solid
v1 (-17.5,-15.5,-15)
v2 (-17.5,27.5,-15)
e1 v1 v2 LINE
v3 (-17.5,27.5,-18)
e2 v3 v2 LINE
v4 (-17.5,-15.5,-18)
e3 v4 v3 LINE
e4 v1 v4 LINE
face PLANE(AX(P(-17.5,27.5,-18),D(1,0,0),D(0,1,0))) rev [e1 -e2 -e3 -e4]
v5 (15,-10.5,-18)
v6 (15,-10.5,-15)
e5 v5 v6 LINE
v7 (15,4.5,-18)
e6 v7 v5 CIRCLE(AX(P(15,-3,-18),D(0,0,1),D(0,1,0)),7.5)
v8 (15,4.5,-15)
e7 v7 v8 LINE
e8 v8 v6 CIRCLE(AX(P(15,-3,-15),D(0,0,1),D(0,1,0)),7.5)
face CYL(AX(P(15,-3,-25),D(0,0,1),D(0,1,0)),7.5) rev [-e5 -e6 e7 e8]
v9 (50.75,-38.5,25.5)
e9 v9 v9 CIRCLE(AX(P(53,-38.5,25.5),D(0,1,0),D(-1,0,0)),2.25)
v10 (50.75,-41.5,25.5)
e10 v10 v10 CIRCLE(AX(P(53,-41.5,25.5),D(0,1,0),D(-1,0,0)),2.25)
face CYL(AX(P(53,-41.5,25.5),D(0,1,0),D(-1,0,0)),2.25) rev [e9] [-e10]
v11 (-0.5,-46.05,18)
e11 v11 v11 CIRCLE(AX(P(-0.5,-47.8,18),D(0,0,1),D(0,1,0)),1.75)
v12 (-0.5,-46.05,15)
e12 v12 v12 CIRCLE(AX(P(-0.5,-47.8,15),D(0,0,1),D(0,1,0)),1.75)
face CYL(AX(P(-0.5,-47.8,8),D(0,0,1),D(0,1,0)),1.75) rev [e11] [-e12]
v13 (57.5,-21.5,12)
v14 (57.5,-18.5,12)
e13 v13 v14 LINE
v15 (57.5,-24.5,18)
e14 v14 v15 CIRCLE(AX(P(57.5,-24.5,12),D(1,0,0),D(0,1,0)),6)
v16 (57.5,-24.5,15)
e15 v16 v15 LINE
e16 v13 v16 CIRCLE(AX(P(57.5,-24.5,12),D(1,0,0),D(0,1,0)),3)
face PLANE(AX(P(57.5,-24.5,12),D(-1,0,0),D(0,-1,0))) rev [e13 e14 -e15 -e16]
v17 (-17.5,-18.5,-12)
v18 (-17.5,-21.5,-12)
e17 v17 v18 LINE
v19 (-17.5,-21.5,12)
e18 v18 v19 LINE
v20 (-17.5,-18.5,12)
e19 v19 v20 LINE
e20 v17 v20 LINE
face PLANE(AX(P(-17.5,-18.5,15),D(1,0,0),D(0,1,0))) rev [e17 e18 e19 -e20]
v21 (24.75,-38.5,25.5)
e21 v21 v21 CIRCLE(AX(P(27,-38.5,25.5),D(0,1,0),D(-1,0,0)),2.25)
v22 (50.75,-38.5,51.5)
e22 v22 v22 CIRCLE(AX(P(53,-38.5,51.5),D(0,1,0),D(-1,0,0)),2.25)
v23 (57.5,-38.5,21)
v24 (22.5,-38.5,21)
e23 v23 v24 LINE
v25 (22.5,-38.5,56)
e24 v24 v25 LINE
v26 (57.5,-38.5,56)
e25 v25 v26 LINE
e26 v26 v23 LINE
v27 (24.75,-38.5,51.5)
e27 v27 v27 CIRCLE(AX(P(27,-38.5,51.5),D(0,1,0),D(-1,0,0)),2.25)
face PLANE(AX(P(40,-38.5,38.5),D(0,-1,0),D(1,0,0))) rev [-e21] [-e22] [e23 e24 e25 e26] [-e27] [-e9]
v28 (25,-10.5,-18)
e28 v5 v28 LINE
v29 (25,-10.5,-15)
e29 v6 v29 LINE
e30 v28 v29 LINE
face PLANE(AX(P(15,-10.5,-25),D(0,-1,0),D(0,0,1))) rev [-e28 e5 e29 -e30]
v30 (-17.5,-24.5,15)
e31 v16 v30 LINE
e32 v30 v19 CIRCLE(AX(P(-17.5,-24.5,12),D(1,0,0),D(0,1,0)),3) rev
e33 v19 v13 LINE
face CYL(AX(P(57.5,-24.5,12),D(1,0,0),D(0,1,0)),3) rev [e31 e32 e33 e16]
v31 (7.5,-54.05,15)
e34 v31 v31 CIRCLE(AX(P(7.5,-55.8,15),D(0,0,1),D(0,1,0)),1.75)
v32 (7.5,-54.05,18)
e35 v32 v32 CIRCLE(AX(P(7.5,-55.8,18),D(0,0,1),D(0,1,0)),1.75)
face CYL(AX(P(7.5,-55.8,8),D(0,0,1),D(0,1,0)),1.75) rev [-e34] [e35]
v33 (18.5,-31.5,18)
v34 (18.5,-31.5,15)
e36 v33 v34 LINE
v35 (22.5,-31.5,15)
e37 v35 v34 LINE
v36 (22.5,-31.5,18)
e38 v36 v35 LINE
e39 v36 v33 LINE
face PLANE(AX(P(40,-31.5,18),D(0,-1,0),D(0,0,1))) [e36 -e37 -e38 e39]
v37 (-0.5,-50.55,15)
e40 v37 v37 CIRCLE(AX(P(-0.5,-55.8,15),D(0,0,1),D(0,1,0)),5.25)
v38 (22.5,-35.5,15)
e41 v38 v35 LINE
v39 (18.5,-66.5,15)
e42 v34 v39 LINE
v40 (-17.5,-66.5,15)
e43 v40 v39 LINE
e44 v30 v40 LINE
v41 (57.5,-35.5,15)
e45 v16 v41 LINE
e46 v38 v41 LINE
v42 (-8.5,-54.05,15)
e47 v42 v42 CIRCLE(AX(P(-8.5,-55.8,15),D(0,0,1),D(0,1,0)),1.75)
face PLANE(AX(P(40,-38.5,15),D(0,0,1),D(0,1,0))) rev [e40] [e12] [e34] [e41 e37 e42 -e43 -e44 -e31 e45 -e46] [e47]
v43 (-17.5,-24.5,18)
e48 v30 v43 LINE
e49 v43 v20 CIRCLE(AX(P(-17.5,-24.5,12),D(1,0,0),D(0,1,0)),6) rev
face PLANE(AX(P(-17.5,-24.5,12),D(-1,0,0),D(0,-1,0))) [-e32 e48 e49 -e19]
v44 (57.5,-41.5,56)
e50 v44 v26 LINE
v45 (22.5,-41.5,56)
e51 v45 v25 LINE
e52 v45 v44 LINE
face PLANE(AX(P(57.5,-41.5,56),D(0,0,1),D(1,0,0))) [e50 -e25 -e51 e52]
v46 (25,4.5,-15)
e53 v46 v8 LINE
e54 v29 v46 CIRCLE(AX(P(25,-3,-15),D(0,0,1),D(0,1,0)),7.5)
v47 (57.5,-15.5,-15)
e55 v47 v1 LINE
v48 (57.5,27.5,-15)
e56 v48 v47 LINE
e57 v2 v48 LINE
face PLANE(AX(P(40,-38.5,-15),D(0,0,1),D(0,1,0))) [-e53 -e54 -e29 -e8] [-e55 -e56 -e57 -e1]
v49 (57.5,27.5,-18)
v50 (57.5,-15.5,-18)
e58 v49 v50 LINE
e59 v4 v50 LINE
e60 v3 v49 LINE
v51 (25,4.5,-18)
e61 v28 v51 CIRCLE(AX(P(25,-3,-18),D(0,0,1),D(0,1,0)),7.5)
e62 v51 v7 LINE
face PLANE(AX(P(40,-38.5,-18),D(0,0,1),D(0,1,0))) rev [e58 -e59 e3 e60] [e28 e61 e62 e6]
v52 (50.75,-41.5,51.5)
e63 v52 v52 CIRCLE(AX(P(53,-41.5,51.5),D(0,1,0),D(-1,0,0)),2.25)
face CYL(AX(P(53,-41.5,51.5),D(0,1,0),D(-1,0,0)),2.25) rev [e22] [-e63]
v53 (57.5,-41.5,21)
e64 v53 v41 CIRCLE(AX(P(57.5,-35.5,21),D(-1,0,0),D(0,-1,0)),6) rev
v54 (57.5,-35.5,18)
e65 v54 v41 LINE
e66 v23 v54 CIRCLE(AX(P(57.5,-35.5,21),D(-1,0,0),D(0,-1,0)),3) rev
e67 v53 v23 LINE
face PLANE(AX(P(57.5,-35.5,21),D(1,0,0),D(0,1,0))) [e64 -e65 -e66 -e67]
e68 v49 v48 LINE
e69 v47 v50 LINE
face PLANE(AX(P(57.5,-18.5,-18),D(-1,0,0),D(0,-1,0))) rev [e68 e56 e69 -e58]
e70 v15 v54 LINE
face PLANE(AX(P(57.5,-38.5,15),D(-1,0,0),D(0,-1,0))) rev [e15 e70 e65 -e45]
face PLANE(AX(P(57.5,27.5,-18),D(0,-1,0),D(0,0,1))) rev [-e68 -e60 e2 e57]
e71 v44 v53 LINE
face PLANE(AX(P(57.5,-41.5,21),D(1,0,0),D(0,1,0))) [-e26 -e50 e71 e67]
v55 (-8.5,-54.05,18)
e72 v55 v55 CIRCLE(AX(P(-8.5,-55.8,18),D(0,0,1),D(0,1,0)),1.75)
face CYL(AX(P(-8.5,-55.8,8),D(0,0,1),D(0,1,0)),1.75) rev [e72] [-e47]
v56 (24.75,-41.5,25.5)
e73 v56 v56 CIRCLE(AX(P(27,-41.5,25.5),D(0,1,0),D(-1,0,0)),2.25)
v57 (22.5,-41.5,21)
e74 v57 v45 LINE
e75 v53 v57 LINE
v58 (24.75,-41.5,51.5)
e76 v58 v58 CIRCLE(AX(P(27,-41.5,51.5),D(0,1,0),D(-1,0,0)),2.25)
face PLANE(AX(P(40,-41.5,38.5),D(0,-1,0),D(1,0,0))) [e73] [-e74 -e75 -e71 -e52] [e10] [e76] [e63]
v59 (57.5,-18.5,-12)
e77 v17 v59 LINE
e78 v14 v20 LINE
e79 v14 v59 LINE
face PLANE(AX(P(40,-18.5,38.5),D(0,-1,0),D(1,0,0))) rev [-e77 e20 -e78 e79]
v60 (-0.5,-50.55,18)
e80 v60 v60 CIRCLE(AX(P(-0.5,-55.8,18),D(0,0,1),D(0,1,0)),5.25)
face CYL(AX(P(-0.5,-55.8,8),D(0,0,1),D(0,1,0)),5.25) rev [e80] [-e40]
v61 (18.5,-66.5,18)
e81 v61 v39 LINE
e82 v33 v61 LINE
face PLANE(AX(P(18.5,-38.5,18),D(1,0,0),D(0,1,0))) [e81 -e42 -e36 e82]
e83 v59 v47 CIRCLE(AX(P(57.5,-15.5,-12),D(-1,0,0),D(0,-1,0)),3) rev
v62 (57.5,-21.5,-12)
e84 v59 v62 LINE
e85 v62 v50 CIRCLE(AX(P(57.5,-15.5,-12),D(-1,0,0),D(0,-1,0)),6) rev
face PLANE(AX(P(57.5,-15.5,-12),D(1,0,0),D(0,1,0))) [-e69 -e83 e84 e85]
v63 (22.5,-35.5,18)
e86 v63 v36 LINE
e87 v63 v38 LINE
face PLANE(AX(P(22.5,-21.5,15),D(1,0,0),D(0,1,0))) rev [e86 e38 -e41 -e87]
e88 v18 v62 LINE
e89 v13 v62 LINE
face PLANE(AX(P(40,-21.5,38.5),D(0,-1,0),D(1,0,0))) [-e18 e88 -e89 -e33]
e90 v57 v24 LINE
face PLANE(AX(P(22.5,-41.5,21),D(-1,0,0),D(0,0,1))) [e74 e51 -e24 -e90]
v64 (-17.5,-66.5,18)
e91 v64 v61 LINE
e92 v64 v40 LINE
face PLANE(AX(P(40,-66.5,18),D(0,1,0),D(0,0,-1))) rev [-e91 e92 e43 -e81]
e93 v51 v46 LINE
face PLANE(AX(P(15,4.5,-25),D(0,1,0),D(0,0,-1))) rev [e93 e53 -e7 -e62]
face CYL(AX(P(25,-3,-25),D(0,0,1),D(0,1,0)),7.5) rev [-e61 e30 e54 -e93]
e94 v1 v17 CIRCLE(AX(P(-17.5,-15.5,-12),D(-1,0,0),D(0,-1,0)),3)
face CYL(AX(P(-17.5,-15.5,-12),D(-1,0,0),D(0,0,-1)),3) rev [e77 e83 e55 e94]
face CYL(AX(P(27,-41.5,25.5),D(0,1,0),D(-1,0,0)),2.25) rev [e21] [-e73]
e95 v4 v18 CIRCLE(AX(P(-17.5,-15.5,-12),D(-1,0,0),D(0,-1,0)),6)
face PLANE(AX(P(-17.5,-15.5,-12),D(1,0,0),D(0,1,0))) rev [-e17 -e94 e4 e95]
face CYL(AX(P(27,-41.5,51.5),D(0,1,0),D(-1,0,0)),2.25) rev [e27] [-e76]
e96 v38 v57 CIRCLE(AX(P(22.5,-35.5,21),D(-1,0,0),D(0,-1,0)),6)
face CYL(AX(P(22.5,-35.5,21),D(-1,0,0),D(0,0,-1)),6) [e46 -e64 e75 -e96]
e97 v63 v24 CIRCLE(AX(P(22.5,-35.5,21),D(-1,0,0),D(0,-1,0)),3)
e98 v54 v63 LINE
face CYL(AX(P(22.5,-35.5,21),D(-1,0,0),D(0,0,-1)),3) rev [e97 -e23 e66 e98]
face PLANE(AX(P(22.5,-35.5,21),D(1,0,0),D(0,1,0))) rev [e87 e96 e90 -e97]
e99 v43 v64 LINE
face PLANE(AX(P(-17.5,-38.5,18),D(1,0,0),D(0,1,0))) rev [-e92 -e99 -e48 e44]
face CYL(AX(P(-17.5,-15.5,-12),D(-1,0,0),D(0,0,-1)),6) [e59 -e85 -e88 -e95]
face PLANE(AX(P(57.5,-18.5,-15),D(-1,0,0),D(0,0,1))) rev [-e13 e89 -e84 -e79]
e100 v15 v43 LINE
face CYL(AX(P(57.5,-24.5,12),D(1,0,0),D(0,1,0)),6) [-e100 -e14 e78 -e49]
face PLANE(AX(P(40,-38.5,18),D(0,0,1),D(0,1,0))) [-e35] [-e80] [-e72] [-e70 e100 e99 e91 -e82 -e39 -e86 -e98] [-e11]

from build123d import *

# Parameters (mm, degrees)
SKETCH1_W                    = 35
SKETCH1_H                    = 35
SKETCH1_R                    = 2.25
BASE_FLANGE1_DEPTH           = 3
EDGE_FLANGE1_DEPTH           = 35
SKETCH9_W                    = 36
SKETCH9_H                    = 35
BOSS_EXTRUDE1_DEPTH          = 3
EDGE_FLANGE2_STRIP_W         = 18
EDGE_FLANGE2_STRIP_H         = 3
EDGE_FLANGE2_STRIP_CUT_DEPTH = 75
EDGE_FLANGE2_DEPTH           = 75
EDGE_FLANGE3_STRIP_W         = 18
EDGE_FLANGE3_STRIP_H         = 3
EDGE_FLANGE3_STRIP_CUT_DEPTH = 75
EDGE_FLANGE3_DEPTH           = 75
SKETCH16_R                   = 5.25
SKETCH16_R_2                 = 1.75
CUT_EXTRUDE1_DEPTH           = 10
CUT_EXTRUDE2_DEPTH           = 10
BODY_MOVE_COPY1_ANGLE        = 180


# Sheet-metal steps are written as plain solids
with BuildPart() as part:
    # Sketch1 → Base-Flange1 (new body)
    with BuildSketch(Plane.XY):
        Rectangle(SKETCH1_W, SKETCH1_H)
        with Locations((-13, 13)):
            Circle(SKETCH1_R, mode=Mode.SUBTRACT)
        with Locations((13, 13)):
            Circle(SKETCH1_R, mode=Mode.SUBTRACT)
        with Locations((13, -13)):
            Circle(SKETCH1_R, mode=Mode.SUBTRACT)
        with Locations((-13, -13)):
            Circle(SKETCH1_R, mode=Mode.SUBTRACT)
    extrude(amount=-BASE_FLANGE1_DEPTH)

    # Edge-Flange1 section (across the edge) → Edge-Flange1 (add)
    with BuildSketch(Plane(origin=(-17.5, -20.5, 0), x_dir=(0, 1, 0), z_dir=(1, 0, 0))):
        with BuildLine():
            Line((-3, 3), (-3, 17))
            Line((-3, 17), (0, 17))
            Line((0, 17), (0, 3))
            ThreePointArc((0, 3), (0.878679656, 0.878679656), (3, 0))
            Line((3, 0), (3, -3))
            ThreePointArc((3, -3), (-1.242640687, -1.242640687), (-3, 3))
        make_face()
    extrude(amount=EDGE_FLANGE1_DEPTH)

    # Sketch9 → Boss-Extrude1 (add)
    with BuildSketch(Plane.XZ.offset(23.5)):
        Polygon((57.5, 17), (17.5, 17), (17.5, 7), (21.5, 7), (57.5, 7), align=None)
        with Locations((39.5, -10.5)):
            Rectangle(SKETCH9_W, SKETCH9_H)
    extrude(amount=-BOSS_EXTRUDE1_DEPTH)

    # Edge-Flange2 strip (across the edge) → Edge-Flange2 strip cut (cut)
    with BuildSketch(Plane(origin=(57.5, -23.5, 17), x_dir=(0, 0, -1), z_dir=(-1, 0, 0))):
        with Locations((-6, -1.5)):
            Rectangle(EDGE_FLANGE2_STRIP_W, EDGE_FLANGE2_STRIP_H)
    extrude(amount=EDGE_FLANGE2_STRIP_CUT_DEPTH, mode=Mode.SUBTRACT)

    # Edge-Flange2 section (across the edge) → Edge-Flange2 (add)
    with BuildSketch(Plane(origin=(57.5, -23.5, 17), x_dir=(0, 0, -1), z_dir=(-1, 0, 0))):
        with BuildLine():
            Line((-3, 3), (-3, 30))
            Line((-3, 30), (0, 30))
            Line((0, 30), (0, 3))
            ThreePointArc((0, 3), (0.878679656, 0.878679656), (3, 0))
            Line((3, 0), (3, -3))
            ThreePointArc((3, -3), (-1.242640687, -1.242640687), (-3, 3))
        make_face()
    extrude(amount=EDGE_FLANGE2_DEPTH)

    # Edge-Flange3 strip (across the edge) → Edge-Flange3 strip cut (cut)
    with BuildSketch(Plane(origin=(-17.5, -53.5, 20), x_dir=(0, 1, 0), z_dir=(1, 0, 0))):
        with Locations((-6, -1.5)):
            Rectangle(EDGE_FLANGE3_STRIP_W, EDGE_FLANGE3_STRIP_H)
    extrude(amount=EDGE_FLANGE3_STRIP_CUT_DEPTH, mode=Mode.SUBTRACT)

    # Edge-Flange3 section (across the edge) → Edge-Flange3 (add)
    with BuildSketch(Plane(origin=(-17.5, -53.5, 20), x_dir=(0, 1, 0), z_dir=(1, 0, 0))):
        with BuildLine():
            Line((-3, 3), (-3, 46))
            Line((-3, 46), (0, 46))
            Line((0, 46), (0, 3))
            ThreePointArc((0, 3), (0.878679656, 0.878679656), (3, 0))
            Line((3, 0), (3, -3))
            ThreePointArc((3, -3), (-1.242640687, -1.242640687), (-3, 3))
        make_face()
    extrude(amount=EDGE_FLANGE3_DEPTH)

    # Sketch16 → Cut-Extrude1 (cut)
    with BuildSketch(Plane(origin=(0, -20.5, 0), x_dir=(1, 0, 0), z_dir=(0, 1, 0))):
        with Locations(Location((40.5, 17.3, 0), (0, 0, 270))):
            Circle(SKETCH16_R)
        with Locations(Location((40.5, 9.3, 0), (0, 0, 270))):
            Circle(SKETCH16_R_2)
        with Locations(Location((48.5, 17.3, 0), (0, 0, 270))):
            Circle(SKETCH16_R_2)
        with Locations(Location((32.5, 17.3, 0), (0, 0, 270))):
            Circle(SKETCH16_R_2)
    extrude(amount=-CUT_EXTRUDE1_DEPTH, mode=Mode.SUBTRACT)

    # Sketch17 → Cut-Extrude2 (cut)
    with BuildSketch(Plane(origin=(0, -53.5, 0), x_dir=(1, 0, 0), z_dir=(0, 1, 0))):
        with BuildLine():
            Line((25, -43), (15, -43))
            ThreePointArc((15, -43), (7.5, -35.5), (15, -28))
            Line((15, -28), (25, -28))
            ThreePointArc((25, -28), (32.5, -35.5), (25, -43))
        make_face()
    extrude(amount=-CUT_EXTRUDE2_DEPTH, mode=Mode.SUBTRACT)


with BuildPart() as part_1:
    # Body-Move/Copy1: moved
    add(part.part.moved(Location((0, 0, 0))).rotate(Axis((20, -19.25, 19.25), (-4.937700262163626e-15, 0.7071067811864181, 0.707106781186677)), BODY_MOVE_COPY1_ANGLE))


solid = part_1.part
